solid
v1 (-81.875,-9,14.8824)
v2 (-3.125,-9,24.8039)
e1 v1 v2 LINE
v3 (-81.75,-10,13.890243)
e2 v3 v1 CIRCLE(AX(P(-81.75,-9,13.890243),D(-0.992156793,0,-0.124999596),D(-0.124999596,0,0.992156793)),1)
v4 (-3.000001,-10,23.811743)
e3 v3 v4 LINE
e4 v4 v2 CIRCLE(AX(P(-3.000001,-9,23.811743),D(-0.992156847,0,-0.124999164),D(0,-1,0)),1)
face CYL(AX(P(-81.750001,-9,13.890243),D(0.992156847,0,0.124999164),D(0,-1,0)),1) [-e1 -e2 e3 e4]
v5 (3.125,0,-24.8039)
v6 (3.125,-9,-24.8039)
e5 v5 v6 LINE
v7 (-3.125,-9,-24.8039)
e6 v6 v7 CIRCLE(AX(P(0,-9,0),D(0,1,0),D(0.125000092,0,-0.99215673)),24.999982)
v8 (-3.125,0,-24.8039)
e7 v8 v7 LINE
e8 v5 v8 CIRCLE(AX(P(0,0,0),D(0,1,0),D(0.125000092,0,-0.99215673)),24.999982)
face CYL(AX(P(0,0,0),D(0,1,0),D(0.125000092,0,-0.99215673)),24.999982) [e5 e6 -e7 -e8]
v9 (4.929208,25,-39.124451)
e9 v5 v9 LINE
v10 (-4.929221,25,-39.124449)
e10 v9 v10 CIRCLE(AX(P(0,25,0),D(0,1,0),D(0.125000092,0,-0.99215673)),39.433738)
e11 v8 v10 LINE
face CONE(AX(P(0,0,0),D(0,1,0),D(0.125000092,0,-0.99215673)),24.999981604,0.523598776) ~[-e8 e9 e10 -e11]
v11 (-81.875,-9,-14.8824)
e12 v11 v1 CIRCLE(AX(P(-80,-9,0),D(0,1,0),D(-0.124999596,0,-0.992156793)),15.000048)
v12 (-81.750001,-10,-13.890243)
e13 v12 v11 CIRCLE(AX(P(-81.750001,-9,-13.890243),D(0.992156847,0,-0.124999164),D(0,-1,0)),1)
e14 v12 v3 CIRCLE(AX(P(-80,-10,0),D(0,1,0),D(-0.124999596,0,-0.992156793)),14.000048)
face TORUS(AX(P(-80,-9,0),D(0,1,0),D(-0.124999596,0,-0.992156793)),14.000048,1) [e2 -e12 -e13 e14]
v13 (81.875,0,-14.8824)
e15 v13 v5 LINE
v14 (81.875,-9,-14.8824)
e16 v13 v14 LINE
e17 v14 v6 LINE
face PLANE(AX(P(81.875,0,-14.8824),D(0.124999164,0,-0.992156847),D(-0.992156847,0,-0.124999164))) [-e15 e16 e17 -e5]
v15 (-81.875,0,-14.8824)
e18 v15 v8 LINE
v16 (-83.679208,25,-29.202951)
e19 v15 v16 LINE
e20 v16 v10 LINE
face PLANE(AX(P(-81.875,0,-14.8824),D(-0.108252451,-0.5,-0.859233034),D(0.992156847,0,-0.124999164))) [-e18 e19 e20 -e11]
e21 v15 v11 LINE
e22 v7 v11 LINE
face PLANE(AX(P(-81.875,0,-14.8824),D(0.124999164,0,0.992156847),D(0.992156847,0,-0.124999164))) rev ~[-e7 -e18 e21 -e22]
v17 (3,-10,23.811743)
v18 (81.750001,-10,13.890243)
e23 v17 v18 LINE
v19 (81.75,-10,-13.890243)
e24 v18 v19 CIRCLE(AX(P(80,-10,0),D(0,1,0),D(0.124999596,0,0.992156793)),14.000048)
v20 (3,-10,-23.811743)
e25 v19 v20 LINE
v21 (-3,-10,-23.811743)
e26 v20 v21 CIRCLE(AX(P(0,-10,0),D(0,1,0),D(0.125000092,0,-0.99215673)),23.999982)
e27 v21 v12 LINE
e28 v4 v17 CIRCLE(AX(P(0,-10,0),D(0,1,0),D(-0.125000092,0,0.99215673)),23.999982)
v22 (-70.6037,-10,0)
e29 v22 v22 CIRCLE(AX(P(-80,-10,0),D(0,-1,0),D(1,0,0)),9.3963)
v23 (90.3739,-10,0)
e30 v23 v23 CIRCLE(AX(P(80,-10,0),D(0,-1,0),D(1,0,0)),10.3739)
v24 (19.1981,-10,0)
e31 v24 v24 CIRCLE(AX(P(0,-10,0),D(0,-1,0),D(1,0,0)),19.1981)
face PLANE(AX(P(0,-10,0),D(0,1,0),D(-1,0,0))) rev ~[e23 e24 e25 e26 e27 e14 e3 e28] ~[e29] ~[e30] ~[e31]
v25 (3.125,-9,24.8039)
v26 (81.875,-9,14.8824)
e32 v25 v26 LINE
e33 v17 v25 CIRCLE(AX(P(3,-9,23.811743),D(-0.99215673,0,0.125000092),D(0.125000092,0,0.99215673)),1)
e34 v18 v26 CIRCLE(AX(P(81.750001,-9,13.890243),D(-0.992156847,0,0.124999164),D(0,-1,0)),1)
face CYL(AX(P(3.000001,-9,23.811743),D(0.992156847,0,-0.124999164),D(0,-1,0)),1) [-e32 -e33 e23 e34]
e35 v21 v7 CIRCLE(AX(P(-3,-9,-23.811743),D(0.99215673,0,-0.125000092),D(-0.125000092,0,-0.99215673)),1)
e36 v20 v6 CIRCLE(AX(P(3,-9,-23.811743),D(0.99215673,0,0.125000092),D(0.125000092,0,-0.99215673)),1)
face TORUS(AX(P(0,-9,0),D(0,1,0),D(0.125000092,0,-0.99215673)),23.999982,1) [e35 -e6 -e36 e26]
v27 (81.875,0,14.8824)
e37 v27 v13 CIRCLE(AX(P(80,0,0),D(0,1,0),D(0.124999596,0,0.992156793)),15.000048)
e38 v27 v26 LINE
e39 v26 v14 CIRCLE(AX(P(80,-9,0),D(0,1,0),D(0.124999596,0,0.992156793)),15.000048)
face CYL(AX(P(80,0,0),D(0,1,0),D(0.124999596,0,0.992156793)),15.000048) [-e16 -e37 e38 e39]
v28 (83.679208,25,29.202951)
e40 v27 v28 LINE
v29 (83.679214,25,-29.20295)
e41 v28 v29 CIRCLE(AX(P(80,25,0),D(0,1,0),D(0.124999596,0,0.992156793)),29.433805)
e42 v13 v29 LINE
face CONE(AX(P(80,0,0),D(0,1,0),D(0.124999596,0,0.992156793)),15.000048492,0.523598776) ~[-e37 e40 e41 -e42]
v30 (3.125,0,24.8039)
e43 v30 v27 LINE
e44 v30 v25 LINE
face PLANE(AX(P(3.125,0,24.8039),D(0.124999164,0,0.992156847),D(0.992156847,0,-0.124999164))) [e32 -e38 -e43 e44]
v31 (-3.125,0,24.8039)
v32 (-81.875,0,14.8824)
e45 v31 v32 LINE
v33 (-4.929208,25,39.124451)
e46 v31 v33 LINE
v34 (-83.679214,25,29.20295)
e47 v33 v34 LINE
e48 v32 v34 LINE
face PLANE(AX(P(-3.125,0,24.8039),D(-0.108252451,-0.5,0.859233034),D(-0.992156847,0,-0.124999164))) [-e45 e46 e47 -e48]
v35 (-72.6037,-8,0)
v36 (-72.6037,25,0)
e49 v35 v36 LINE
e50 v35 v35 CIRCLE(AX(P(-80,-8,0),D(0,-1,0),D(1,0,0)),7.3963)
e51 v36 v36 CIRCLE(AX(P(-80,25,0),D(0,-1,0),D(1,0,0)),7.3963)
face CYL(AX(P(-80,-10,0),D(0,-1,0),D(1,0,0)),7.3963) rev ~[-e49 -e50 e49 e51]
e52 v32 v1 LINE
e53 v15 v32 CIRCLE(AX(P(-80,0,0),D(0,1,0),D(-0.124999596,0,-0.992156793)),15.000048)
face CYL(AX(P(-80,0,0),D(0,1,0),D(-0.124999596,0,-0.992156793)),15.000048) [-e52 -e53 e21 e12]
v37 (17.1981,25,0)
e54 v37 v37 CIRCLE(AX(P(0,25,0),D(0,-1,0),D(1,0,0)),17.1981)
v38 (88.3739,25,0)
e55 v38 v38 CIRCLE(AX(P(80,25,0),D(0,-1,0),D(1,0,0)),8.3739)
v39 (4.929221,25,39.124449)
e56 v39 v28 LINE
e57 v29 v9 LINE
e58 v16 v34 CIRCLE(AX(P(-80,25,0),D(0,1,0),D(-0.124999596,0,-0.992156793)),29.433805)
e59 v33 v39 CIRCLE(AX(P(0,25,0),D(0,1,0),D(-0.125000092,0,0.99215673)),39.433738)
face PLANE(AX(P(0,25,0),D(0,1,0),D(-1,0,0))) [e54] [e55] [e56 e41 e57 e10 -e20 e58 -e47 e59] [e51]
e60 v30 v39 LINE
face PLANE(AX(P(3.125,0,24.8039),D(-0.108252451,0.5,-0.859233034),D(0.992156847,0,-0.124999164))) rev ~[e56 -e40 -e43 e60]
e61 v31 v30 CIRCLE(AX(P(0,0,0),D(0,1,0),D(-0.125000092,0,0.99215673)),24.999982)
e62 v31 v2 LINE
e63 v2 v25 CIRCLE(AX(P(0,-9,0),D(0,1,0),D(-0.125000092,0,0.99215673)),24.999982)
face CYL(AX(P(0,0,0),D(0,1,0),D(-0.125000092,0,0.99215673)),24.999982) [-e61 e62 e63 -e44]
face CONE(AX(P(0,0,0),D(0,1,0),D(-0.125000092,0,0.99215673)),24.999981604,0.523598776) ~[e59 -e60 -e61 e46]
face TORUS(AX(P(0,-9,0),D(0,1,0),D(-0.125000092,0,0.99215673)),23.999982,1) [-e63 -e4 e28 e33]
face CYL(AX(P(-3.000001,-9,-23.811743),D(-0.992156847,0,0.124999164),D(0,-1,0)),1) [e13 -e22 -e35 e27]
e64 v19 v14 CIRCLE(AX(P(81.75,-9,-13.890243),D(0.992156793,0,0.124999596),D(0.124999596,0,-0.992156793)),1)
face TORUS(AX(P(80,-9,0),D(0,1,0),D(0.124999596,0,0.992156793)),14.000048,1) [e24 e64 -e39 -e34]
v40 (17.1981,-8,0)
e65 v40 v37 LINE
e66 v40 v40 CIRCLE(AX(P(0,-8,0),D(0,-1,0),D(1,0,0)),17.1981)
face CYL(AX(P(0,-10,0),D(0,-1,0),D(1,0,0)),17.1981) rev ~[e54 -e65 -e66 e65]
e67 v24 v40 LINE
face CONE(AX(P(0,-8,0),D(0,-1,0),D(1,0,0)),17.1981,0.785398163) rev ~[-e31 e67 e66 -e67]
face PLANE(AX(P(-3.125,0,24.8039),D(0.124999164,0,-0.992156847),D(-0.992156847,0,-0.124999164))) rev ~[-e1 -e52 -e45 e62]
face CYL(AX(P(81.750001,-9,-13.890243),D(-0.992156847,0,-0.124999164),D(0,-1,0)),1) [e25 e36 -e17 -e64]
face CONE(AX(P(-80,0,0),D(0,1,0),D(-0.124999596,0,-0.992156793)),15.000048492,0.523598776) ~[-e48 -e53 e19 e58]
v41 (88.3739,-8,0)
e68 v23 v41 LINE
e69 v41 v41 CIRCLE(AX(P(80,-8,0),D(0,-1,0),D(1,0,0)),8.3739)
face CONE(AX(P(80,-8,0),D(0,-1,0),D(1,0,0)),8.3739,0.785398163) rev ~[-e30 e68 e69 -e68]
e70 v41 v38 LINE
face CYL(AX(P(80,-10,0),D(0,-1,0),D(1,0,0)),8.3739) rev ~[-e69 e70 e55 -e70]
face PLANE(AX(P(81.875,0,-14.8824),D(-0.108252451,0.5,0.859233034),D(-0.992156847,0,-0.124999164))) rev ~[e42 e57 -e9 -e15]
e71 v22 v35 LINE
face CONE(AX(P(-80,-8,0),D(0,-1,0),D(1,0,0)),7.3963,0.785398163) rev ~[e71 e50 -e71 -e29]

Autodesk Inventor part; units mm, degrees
ref_plane "YZ Plane" through (0, 0, 0) normal (1, 0, 0) x (0, 1, 0)
ref_plane "XZ Plane" through (0, 0, 0) normal (0, 1, 0) x (-1, 0, 0)
ref_plane "XY Plane" through (0, 0, 0) normal (0, 0, 1) x (1, 0, 0)
sketch "Boceto1" plane through (0, 0, 0) normal (0, 1, 0) x (-1, 0, 0)
  arc A0 (81.875, -14.8824) -> (81.875, 14.8824) centre (80, 0) ccw
  line L0 (81.875, -14.8824) -> (3.125, -24.8039)
  line L1 (3.125, 24.8039) -> (81.875, 14.8824)
  line L2 (0, -32.0701) -> (0, 49.2426) construction
  arc A1 (-81.875, 14.8824) -> (-81.875, -14.8824) centre (-80, 0) ccw
  line L3 (-81.875, -14.8824) -> (-3.125, -24.8039)
  line L4 (-3.125, 24.8039) -> (-81.875, 14.8824)
  arc A2 (3.125, 24.8039) -> (-3.125, 24.8039) centre (0, 0) ccw
  arc A3 (-3.125, -24.8039) -> (3.125, -24.8039) centre (0, 0) ccw
  dimension "d1" = 30
  dimension "d2" = 80
extrude "Extrusión1" add sketch "Boceto1" along normal blind 25 draft 30 and the other way blind 10
sketch "Boceto2" plane through (0, -10, 0) normal (0, -1, 0) x (1, 0, 0)
  arc A0 (81.875, -14.8824) -> (81.875, 14.8824) centre (80, 0) ccw projected
  line L0 (81.875, 14.8824) -> (3.125, 24.8039) projected
  arc A1 (3.125, 24.8039) -> (-3.125, 24.8039) centre (0, 0) ccw projected
  line L1 (-3.125, 24.8039) -> (-81.875, 14.8824) projected
  arc A2 (-81.875, 14.8824) -> (-81.875, -14.8824) centre (-80, 0) ccw projected
  line L2 (-81.875, -14.8824) -> (-3.125, -24.8039) projected
  arc A3 (-3.125, -24.8039) -> (3.125, -24.8039) centre (0, 0) ccw projected
  line L3 (3.125, -24.8039) -> (81.875, -14.8824) projected
  circle A4 centre (0, 0) radius 17.1981
  circle A5 centre (-80, 0) radius 7.3963
  circle A6 centre (80, 0) radius 8.3739
extrude "Extrusión2" cut sketch "Boceto2" against normal through all contours A4 | A5 | A6
chamfer "Chaflán1" distance 2 angle 45 1 edges at (-87.3963, -10, 0)
chamfer "Chaflán2" distance 2 angle 45 1 edges at (-17.1981, -10, 0)
chamfer "Chaflán3" distance 2 angle 45 1 edges at (71.6261, -10, 0)
fillet "Empalme1" radius 1 8 edges at (0, -10, -25) (42.5, -10, -19.8431) (95, -10, 0) (42.5, -10, 19.8431) (0, -10, 25) (-42.5, -10, 19.8431) (-95, -10, 0) (-42.5, -10, -19.8431)
equation "\"Radio_pliegue\" = Grosor"
equation "\"Anchura_desahogo_plegado\" = Grosor"
equation "\"Profundidad_desahogo_plegado\" = 0.5 * Grosor"
equation "\"Tamaño_destalonado\" = 4 * Grosor"
equation "\"Remanente_mínimo\" = 2 * Grosor"
equation "\"Radiodetransición\" = Radio_pliegue"
equation "\"Tamaño_de_radio_de_Jacobi\" = Radio_pliegue"
equation "\"TamañoSeparación\" = Grosor"
equation "\"Grosor\" = 0.5"
properties part number "Practica4" material "Aluminio 6061-AHC"
